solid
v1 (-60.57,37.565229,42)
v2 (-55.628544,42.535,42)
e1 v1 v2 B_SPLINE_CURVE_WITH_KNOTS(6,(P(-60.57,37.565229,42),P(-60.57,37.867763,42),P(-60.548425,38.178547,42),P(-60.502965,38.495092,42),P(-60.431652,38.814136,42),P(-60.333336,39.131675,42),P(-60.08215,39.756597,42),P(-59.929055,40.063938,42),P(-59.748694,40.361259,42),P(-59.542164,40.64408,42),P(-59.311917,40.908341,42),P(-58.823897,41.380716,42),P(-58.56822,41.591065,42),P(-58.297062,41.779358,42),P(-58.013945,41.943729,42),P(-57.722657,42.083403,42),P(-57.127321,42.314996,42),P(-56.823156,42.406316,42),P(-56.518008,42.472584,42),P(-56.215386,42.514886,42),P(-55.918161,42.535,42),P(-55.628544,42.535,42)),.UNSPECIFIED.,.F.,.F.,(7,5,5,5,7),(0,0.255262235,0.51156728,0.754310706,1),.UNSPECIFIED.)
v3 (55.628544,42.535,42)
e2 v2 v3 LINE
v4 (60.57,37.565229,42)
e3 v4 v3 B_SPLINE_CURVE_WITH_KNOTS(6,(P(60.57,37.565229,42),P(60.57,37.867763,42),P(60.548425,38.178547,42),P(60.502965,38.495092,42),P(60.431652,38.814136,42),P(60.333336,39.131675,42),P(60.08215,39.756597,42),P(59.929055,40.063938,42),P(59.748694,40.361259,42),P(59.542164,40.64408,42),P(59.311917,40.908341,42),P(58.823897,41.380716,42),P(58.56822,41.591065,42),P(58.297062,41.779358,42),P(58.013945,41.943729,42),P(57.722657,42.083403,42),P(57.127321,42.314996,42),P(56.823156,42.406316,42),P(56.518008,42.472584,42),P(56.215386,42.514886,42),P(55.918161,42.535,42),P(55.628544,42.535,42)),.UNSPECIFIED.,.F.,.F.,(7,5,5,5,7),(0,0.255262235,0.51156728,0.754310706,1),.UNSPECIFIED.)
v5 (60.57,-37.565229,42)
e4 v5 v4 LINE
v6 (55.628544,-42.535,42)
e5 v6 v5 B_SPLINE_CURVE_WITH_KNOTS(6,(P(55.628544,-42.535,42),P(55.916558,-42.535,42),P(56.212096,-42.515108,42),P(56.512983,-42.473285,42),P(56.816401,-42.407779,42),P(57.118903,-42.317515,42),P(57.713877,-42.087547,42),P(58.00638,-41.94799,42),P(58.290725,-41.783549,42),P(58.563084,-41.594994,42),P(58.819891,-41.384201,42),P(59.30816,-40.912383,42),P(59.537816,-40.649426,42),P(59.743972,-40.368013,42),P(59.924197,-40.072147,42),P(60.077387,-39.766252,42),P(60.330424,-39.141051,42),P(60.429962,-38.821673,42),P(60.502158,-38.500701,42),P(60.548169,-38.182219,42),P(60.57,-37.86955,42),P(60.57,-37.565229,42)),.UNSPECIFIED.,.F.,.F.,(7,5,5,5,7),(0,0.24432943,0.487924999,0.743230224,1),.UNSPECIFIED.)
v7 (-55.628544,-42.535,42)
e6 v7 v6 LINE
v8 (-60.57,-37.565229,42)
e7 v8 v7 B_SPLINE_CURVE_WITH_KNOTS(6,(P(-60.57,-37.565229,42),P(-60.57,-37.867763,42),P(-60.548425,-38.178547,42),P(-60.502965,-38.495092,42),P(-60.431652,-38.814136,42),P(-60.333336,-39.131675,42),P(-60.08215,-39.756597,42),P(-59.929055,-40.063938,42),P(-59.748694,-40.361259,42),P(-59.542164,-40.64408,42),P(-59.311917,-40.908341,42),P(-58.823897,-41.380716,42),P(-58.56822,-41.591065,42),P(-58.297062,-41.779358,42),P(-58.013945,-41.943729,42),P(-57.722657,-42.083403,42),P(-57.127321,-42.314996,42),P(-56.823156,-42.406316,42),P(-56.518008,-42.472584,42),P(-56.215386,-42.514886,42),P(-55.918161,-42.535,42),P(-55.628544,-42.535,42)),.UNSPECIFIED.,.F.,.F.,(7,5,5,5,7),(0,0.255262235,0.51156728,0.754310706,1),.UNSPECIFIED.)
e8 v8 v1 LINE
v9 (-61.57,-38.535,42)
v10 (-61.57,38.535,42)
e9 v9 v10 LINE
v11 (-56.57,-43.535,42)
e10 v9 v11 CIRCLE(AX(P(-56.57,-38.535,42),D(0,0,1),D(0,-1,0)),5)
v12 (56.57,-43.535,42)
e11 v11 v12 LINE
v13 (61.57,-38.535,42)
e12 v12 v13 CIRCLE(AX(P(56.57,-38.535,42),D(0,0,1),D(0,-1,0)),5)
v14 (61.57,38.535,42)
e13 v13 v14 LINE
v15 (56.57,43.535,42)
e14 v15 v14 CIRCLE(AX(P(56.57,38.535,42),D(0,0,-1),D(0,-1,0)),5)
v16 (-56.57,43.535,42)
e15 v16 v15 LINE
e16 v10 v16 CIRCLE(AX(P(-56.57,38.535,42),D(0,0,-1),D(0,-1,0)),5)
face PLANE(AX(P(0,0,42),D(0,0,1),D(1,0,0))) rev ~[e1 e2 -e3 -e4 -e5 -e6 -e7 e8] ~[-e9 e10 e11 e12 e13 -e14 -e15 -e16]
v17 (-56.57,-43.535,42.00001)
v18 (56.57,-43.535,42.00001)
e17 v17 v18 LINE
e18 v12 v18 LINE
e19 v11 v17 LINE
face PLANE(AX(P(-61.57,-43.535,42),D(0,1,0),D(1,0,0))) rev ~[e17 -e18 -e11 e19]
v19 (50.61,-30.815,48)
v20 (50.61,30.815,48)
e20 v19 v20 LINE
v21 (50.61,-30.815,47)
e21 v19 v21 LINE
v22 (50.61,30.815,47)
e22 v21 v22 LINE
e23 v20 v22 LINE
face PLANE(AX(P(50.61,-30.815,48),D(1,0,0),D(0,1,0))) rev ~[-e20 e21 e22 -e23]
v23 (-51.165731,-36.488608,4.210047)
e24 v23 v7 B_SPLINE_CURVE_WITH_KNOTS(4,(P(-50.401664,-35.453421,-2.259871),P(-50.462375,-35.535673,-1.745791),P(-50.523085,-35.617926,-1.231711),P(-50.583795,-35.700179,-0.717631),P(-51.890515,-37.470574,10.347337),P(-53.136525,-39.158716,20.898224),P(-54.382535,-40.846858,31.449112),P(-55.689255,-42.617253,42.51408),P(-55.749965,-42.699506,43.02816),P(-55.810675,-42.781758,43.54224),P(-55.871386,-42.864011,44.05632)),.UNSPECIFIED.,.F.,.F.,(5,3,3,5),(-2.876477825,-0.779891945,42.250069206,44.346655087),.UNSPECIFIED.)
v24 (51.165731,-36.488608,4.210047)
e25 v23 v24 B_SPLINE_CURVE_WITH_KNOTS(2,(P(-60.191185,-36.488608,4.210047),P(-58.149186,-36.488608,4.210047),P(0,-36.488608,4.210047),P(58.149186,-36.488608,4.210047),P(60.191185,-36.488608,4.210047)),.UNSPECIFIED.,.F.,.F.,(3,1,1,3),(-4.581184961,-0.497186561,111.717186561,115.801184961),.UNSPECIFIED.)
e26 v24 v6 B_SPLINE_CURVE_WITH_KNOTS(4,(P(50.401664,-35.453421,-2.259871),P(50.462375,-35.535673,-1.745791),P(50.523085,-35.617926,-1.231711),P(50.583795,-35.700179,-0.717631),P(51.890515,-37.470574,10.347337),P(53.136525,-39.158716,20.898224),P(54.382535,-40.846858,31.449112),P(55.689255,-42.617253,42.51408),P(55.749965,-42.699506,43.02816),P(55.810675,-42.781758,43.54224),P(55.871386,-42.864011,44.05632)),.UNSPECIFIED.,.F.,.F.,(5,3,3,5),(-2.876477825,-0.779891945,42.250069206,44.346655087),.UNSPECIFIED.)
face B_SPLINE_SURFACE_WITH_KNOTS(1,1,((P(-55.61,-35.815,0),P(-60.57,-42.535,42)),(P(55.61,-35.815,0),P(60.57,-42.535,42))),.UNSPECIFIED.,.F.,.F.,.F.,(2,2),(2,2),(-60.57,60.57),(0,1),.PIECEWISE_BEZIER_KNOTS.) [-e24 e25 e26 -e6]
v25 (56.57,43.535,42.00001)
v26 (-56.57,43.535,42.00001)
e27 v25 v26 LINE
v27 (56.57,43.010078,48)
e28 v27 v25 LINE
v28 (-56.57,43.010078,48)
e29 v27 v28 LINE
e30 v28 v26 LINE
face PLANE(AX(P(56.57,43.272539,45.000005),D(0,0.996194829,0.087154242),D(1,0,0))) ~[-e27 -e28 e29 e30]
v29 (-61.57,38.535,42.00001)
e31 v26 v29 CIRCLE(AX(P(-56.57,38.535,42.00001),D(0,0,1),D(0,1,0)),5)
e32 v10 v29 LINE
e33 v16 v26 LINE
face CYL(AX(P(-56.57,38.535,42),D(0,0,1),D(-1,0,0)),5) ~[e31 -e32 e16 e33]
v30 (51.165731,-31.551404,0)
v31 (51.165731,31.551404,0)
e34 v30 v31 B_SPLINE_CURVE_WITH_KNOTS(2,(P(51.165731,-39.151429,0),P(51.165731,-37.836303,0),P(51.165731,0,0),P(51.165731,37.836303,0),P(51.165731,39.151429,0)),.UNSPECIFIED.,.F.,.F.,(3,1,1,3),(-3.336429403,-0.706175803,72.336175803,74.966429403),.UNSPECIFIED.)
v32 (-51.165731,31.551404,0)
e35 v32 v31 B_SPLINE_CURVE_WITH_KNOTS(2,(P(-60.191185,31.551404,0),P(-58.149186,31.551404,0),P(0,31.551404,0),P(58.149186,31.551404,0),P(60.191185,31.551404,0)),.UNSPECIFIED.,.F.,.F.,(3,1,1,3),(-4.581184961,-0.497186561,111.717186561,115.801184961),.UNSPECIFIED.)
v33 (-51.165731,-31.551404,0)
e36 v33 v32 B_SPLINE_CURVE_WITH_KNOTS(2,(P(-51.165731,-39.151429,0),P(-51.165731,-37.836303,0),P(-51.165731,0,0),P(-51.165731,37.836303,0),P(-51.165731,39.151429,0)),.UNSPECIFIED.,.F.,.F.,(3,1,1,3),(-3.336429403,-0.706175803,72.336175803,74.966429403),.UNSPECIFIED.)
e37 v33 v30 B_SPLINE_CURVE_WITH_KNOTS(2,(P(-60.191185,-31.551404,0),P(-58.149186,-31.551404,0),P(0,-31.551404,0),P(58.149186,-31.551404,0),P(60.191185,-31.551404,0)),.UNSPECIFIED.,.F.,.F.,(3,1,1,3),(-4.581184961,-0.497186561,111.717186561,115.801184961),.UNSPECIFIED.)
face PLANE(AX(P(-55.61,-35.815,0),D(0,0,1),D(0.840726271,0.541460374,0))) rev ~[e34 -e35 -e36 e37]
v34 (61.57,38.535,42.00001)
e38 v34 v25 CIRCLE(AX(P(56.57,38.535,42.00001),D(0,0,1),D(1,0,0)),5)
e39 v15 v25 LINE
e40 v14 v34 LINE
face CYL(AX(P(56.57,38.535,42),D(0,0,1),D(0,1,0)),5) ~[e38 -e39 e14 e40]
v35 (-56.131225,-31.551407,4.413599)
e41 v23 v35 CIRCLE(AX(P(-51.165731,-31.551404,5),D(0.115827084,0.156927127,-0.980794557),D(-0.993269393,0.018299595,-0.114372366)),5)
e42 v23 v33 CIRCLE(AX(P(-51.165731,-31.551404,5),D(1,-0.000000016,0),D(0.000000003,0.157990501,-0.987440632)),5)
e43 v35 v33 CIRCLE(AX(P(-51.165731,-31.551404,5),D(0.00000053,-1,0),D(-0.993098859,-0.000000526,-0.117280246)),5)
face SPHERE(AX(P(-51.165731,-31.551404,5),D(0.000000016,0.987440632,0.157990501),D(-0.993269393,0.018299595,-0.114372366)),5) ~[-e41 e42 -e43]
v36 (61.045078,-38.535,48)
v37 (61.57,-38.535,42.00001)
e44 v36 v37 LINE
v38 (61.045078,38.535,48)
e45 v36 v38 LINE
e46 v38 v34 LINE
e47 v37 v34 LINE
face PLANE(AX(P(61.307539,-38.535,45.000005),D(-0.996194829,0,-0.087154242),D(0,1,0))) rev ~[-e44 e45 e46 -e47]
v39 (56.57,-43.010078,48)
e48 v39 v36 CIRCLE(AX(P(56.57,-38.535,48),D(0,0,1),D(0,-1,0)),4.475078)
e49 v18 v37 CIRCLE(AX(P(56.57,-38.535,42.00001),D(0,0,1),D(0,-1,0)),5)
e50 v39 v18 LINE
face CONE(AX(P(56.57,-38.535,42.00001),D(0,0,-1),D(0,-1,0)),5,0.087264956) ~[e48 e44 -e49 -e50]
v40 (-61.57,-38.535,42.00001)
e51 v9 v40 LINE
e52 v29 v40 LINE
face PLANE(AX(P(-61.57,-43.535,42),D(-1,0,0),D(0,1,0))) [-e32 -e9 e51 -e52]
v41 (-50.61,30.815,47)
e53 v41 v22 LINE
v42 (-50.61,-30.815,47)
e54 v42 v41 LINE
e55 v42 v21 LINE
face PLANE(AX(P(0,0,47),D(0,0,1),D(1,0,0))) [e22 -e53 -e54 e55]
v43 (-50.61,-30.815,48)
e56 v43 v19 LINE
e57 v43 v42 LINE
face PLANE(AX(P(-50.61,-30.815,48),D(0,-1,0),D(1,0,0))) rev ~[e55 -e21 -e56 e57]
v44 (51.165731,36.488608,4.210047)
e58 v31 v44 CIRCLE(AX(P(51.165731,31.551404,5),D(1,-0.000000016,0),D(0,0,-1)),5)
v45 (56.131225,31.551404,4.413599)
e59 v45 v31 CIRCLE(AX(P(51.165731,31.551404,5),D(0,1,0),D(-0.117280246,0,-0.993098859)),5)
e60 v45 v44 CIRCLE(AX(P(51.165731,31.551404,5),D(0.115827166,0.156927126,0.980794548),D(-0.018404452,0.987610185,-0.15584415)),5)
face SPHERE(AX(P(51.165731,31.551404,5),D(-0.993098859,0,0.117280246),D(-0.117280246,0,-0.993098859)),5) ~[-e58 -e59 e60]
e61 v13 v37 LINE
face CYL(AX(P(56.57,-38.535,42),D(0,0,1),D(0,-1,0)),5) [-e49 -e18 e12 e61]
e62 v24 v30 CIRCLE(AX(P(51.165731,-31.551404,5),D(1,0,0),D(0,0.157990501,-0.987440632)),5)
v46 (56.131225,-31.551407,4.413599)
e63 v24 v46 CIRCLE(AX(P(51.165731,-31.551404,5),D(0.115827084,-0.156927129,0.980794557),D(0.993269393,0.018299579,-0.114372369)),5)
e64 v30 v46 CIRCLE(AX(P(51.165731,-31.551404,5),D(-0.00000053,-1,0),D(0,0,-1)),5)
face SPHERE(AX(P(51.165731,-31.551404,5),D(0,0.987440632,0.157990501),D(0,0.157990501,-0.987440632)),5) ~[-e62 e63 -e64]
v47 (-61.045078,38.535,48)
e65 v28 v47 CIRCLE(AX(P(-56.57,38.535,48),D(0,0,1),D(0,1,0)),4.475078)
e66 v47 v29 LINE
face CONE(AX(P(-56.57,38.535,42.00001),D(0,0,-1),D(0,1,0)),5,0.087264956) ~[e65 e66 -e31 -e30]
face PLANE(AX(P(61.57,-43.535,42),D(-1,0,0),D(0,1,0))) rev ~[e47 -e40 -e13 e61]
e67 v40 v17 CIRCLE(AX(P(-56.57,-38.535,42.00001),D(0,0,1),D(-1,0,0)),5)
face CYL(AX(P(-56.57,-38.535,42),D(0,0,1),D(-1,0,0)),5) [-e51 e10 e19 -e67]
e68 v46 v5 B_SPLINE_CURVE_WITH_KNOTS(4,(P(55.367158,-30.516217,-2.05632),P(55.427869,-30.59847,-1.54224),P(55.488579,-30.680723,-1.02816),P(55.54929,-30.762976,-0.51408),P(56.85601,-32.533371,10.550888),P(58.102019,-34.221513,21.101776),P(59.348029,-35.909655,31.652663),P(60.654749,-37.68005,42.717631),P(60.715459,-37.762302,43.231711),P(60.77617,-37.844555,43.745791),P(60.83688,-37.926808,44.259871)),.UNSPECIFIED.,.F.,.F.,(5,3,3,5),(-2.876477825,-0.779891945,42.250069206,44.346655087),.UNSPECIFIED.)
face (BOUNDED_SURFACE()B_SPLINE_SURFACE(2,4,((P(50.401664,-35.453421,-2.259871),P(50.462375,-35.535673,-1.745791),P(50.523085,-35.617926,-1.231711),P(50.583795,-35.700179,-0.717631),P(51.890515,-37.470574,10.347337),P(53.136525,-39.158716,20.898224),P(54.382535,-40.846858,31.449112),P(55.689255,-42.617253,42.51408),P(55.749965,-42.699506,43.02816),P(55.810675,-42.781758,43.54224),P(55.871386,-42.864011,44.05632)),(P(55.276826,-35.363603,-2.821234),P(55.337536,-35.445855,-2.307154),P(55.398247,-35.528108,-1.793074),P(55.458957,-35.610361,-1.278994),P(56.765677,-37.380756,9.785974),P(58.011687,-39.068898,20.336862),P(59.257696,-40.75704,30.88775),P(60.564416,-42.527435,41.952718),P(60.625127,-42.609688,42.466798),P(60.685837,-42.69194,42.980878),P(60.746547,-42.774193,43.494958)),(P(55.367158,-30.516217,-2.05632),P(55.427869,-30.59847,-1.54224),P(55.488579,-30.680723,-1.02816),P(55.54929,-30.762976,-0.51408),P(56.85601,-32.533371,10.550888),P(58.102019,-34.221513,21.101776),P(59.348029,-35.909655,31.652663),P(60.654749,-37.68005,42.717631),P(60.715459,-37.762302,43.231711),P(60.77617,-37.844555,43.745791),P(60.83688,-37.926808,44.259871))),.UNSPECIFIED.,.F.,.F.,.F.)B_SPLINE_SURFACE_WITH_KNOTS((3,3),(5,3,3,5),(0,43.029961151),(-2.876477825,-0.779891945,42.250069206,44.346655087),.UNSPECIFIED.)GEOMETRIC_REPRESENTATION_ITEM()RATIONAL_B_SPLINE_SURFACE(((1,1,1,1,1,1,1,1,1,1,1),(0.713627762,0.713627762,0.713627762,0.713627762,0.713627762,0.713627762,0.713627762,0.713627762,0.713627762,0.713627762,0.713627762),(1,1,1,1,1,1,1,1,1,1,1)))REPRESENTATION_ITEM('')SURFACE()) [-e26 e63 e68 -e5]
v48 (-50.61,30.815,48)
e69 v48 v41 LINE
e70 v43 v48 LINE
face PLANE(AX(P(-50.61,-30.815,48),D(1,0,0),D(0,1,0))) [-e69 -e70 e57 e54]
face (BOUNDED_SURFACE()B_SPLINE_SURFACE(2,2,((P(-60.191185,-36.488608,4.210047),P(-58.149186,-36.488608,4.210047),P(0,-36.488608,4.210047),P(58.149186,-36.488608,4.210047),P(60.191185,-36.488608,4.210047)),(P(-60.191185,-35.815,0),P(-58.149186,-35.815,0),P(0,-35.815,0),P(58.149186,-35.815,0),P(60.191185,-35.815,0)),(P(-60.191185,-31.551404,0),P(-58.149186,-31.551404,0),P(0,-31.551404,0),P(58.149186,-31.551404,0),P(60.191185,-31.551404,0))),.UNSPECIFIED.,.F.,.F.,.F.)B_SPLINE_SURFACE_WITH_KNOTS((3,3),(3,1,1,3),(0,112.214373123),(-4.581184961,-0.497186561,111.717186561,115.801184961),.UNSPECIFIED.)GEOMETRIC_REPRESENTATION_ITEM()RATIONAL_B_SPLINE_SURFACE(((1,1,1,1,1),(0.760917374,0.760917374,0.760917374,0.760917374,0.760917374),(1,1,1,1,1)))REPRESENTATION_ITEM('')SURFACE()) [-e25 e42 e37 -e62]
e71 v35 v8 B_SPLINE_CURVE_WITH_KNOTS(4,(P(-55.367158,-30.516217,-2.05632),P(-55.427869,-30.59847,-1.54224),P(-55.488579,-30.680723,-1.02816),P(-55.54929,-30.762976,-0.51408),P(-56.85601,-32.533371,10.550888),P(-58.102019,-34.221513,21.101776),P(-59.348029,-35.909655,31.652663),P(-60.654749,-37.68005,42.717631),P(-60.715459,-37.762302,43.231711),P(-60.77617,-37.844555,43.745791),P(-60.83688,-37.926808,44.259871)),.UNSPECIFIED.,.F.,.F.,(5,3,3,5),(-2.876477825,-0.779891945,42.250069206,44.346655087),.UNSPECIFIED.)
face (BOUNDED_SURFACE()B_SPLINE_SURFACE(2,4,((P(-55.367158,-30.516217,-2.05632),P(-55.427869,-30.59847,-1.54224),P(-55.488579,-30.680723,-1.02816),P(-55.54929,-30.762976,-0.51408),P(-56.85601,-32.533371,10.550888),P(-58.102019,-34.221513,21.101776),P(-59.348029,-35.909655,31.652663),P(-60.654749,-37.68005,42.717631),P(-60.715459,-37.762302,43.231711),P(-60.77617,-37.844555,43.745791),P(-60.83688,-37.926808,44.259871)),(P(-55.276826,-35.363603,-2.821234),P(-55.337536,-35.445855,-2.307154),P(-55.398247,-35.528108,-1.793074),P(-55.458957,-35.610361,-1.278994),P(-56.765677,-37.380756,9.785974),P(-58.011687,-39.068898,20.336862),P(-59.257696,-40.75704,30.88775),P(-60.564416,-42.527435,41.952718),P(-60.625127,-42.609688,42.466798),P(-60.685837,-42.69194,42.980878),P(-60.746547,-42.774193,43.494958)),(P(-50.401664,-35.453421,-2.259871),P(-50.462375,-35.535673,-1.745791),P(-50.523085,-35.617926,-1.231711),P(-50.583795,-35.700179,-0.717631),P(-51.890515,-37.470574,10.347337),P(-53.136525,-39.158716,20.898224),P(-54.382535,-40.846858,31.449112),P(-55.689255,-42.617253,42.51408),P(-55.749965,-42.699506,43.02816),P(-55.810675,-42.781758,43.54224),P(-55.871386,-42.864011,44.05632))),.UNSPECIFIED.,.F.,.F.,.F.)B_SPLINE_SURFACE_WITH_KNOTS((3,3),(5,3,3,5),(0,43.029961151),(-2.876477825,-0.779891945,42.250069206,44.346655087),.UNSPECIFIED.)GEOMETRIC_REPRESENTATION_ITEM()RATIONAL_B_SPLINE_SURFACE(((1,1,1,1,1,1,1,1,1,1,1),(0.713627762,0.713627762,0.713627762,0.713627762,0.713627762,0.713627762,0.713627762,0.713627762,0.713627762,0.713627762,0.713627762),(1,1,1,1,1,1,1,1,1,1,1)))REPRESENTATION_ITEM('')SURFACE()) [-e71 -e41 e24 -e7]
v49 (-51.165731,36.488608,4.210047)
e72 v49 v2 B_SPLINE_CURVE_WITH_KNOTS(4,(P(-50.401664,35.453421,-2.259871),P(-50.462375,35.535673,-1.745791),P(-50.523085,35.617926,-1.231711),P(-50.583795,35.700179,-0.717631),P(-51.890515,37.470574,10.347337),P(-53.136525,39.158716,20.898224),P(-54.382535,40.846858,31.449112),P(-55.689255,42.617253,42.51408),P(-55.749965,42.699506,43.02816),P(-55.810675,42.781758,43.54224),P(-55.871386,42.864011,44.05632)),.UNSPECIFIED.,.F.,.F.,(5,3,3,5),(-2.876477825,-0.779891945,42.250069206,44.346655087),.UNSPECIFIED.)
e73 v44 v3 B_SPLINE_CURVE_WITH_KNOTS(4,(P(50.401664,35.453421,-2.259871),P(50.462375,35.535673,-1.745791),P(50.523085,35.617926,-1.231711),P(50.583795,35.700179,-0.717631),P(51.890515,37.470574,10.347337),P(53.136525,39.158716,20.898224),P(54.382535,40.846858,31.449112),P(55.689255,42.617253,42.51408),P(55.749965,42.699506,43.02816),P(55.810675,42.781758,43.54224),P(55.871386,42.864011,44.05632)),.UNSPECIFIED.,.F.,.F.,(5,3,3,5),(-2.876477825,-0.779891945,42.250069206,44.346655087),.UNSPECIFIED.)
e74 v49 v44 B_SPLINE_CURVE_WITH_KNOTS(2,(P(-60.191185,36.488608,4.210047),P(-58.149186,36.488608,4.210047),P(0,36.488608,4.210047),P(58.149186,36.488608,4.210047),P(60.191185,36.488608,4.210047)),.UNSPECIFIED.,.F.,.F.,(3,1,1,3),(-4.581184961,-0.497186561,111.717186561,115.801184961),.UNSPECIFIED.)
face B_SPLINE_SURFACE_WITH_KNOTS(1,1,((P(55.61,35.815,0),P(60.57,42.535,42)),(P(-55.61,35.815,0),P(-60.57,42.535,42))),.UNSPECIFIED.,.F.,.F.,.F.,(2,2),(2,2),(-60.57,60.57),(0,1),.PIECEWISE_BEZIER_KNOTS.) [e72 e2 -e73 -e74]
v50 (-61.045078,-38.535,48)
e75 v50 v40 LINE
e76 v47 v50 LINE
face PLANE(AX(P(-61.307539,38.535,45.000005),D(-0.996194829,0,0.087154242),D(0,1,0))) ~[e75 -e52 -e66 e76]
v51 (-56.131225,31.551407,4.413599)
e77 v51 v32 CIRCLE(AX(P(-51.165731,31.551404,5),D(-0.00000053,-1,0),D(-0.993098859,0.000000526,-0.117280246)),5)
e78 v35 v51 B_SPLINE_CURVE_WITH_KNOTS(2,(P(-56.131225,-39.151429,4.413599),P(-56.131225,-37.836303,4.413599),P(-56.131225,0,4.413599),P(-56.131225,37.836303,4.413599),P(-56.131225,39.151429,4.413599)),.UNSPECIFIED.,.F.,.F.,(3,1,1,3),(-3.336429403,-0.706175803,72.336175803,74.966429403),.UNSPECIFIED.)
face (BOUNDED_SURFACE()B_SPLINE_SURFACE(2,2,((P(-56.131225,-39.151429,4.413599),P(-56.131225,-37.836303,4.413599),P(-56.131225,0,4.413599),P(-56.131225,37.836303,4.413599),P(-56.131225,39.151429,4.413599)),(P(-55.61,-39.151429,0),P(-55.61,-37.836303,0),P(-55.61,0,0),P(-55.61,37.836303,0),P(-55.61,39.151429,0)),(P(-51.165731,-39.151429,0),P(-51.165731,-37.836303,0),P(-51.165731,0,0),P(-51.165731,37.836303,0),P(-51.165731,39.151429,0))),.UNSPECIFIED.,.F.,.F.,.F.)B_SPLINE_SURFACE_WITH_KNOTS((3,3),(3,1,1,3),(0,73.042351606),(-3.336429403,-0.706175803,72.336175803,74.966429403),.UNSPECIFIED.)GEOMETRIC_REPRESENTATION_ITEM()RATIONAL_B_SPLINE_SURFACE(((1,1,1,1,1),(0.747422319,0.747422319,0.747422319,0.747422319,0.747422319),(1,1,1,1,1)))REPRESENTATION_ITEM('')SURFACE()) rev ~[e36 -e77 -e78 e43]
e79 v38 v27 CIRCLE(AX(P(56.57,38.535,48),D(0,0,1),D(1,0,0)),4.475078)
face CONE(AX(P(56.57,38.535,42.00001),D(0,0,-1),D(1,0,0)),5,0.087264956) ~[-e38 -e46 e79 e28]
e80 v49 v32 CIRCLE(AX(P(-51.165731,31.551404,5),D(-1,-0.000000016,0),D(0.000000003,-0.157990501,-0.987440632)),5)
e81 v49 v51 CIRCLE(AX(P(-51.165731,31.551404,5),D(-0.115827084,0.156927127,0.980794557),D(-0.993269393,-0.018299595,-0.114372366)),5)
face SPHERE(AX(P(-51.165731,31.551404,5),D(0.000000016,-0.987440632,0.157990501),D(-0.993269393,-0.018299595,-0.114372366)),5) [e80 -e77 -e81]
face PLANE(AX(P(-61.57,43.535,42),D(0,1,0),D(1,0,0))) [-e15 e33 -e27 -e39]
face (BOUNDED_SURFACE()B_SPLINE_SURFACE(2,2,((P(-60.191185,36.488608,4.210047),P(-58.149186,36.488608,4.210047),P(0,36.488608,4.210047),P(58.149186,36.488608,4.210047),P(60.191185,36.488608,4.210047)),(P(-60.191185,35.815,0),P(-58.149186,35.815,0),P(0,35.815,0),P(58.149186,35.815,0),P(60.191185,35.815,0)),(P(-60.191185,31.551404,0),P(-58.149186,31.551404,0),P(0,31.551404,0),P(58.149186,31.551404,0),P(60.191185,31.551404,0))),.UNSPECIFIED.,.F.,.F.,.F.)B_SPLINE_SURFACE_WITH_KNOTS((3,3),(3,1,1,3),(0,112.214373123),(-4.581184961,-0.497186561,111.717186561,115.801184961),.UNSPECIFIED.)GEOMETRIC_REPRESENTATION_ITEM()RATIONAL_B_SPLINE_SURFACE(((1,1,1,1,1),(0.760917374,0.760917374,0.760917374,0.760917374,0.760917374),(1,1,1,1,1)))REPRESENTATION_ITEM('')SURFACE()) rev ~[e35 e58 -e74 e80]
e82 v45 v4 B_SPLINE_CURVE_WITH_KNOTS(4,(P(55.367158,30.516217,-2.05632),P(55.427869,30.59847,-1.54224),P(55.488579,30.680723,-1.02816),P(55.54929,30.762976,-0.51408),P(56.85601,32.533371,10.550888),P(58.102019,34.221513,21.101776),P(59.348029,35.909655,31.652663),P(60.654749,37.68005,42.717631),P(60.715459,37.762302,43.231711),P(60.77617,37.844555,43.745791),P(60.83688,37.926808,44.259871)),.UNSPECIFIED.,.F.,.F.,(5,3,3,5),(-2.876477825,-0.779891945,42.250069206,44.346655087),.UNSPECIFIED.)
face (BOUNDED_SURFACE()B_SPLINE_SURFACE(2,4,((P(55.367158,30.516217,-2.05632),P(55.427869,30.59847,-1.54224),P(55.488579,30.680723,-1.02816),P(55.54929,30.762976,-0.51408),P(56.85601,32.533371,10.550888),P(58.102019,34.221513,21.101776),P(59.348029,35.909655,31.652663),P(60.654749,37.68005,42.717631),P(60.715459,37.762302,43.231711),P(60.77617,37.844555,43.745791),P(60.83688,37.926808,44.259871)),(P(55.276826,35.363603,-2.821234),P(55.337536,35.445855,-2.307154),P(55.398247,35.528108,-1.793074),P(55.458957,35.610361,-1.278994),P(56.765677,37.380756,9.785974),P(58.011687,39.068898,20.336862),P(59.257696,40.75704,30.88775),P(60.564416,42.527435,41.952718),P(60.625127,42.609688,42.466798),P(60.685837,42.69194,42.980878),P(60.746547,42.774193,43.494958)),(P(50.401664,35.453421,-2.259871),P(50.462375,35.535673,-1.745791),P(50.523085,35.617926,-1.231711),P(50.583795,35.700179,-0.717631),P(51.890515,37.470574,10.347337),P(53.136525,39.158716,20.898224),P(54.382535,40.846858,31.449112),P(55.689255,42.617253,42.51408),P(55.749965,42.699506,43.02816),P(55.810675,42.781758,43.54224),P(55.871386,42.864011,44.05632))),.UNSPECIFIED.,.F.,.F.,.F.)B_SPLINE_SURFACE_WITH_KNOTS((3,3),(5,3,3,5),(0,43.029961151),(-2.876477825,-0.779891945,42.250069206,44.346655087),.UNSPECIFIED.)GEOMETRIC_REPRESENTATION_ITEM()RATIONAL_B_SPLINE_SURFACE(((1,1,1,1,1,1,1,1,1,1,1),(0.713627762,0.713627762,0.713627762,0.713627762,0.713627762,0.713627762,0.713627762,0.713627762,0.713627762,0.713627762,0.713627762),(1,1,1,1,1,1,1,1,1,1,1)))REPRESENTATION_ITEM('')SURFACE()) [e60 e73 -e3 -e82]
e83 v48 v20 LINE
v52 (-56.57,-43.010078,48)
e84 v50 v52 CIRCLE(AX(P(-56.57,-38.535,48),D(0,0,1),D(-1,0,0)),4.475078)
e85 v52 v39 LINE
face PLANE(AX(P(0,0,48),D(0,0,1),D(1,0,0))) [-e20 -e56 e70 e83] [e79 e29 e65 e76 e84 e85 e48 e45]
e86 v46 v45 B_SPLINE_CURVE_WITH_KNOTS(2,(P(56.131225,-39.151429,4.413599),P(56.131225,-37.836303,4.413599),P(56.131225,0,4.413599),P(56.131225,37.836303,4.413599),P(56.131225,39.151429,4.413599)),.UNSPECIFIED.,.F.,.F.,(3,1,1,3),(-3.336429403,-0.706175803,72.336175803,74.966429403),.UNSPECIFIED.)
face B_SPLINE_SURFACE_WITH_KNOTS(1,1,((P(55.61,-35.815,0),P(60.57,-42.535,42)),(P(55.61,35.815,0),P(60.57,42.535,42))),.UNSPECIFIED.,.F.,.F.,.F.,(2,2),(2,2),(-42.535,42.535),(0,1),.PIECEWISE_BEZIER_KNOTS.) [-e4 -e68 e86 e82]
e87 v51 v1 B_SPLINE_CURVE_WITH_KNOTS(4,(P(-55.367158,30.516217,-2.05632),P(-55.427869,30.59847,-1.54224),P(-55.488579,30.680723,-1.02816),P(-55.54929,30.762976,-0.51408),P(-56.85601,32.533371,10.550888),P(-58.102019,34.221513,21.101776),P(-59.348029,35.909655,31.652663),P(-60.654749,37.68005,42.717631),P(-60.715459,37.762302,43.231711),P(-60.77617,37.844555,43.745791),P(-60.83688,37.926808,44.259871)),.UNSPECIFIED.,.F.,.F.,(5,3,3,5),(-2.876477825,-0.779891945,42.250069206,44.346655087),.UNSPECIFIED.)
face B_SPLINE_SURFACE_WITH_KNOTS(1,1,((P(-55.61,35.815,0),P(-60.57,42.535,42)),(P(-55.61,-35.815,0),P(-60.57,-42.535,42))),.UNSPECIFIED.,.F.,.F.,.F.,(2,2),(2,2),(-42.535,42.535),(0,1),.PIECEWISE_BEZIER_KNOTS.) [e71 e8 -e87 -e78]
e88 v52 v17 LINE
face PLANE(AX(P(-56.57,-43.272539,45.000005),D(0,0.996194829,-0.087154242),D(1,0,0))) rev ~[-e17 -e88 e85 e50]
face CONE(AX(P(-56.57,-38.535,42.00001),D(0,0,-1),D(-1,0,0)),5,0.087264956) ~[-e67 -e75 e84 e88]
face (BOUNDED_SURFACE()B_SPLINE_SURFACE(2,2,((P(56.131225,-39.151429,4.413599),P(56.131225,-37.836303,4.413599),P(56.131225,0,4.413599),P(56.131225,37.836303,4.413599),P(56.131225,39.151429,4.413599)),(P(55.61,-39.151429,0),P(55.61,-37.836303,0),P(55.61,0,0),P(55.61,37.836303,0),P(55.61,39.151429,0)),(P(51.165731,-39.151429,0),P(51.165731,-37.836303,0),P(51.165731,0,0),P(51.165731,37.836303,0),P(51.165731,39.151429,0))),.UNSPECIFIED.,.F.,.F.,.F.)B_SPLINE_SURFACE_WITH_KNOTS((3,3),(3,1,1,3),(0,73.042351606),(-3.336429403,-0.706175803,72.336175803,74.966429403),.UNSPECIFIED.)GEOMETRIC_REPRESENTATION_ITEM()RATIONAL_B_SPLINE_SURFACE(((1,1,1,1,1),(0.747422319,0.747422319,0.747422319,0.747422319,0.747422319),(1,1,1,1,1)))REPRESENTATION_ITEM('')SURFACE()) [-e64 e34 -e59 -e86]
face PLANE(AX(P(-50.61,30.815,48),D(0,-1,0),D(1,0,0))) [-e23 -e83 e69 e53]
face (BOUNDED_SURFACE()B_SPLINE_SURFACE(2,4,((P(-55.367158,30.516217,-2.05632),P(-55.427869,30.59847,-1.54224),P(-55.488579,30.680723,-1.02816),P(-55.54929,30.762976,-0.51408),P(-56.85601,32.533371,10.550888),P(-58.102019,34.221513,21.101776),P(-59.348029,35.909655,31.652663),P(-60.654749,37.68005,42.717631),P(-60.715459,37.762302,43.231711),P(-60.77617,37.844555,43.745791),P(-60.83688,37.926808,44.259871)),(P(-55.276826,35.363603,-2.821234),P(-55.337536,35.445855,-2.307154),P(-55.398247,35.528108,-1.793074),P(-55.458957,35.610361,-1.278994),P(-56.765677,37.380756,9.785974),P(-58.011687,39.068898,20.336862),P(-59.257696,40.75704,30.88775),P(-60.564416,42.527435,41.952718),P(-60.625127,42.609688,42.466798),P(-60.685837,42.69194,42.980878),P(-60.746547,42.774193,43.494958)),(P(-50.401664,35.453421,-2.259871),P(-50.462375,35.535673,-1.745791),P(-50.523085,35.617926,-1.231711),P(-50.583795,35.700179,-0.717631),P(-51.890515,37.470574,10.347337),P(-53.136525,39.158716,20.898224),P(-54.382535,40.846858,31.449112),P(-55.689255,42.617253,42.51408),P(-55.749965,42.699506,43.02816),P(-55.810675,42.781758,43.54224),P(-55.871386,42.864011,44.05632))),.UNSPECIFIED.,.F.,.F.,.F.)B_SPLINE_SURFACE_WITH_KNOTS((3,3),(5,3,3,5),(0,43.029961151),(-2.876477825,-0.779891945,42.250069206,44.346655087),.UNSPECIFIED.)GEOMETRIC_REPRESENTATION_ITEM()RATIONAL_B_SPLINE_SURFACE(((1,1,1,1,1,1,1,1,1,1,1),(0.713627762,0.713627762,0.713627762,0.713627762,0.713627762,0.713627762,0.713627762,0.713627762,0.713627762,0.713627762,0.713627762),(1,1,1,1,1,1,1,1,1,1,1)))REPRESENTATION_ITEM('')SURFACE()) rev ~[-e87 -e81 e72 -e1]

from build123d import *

# Parameters (mm, degrees)
F0_W      = 111.22
F0_H      = 71.63
F2_W      = 121.14
F2_H      = 85.07
F4_R      = 5
F5_W      = 123.14
F5_H      = 87.07
F6_DEPTH  = 6
F7_W      = 101.22
F7_H      = 61.63
F8_DEPTH  = 1
F9_R      = 5
F10_SIZE2 = 5.99999
F10_SIZE  = 0.524922


# Not quite as in the source:
# - a fillet or chamfer is up to 0.001 mm smaller than in the source, because OpenCascade refuses the exact size


with BuildPart() as f3:
    # F0 (on Top) → F3 section 0
    with BuildSketch(Plane.XY):
        Rectangle(F0_W, F0_H)
    # F2 (on offset) → F3 section 1
    with BuildSketch(Plane.XY.offset(42)):
        Rectangle(F2_W, F2_H)
    loft()

    # F4
    f4_edges = [f3.edges().sort_by_distance(p)[0] for p in [
        (-55.61, 0, 0),
        (-58.09, 39.175, 21),
        (0, 35.815, 0),
        (55.61, 0, 0),
        (58.09, 39.175, 21),
        (-58.09, -39.175, 21),
        (0, -35.815, 0),
        (58.09, -39.175, 21),
    ]]
    fillet(f4_edges, radius=F4_R)

    # F5 (on face) → F6 (join)
    with BuildSketch(Plane.XY.offset(42)):
        Rectangle(F5_W, F5_H)
        with BuildLine():
            Line((60.57, 37.5652286365), (60.57, -37.5652286365))
            add(Edge.make_bspline(
                [(60.57, -37.5652286365), (60.57, -37.8677629795), (60.5484249291, -38.1785474247), (60.5029654317, -38.4950915318), (60.4316524162, -38.8141360023), (60.3333363666, -39.1316751054), (60.0821499269, -39.7565973164), (59.9290553292, -40.0639382754), (59.7486936762, -40.3612591505), (59.5421641644, -40.6440796366), (59.3119172372, -40.9083408285), (58.8238966802, -41.3807158702), (58.5682195509, -41.5910650721), (58.2970619174, -41.7793580892), (58.013945443, -41.9437291503), (57.7226574277, -42.0834034649), (57.1273207787, -42.3149957608), (56.8231561933, -42.4063160322), (56.5180078096, -42.4725842951), (56.2153860403, -42.5148862736), (55.9181609136, -42.535), (55.628544141, -42.535)],
                knots=[0, 0, 0, 0, 0, 0, 0, 0.2552622354, 0.2552622354, 0.2552622354, 0.2552622354, 0.2552622354, 0.5115672797, 0.5115672797, 0.5115672797, 0.5115672797, 0.5115672797, 0.7543107062, 0.7543107062, 0.7543107062, 0.7543107062, 0.7543107062, 1, 1, 1, 1, 1, 1, 1], degree=6))
            Line((55.628544141, -42.535), (-55.628544141, -42.535))
            add(Edge.make_bspline(
                [(-60.57, -37.5652286365), (-60.57, -37.8677629794), (-60.5484249292, -38.1785474246), (-60.5029654317, -38.4950915316), (-60.4316524163, -38.814136002), (-60.3333363667, -39.1316751051), (-60.0821499271, -39.756597316), (-59.9290553294, -40.0639382751), (-59.7486936764, -40.3612591501), (-59.5421641646, -40.6440796363), (-59.3119172375, -40.9083408282), (-58.8238966804, -41.38071587), (-58.5682195512, -41.591065072), (-58.2970619176, -41.7793580891), (-58.0139454431, -41.9437291502), (-57.7226574278, -42.0834034648), (-57.1273207787, -42.3149957608), (-56.8231561933, -42.4063160322), (-56.5180078096, -42.4725842951), (-56.2153860403, -42.5148862736), (-55.9181609136, -42.535), (-55.628544141, -42.535)],
                knots=[0, 0, 0, 0, 0, 0, 0, 0.2552622353, 0.2552622353, 0.2552622353, 0.2552622353, 0.2552622353, 0.5115672797, 0.5115672797, 0.5115672797, 0.5115672797, 0.5115672797, 0.7543107062, 0.7543107062, 0.7543107062, 0.7543107062, 0.7543107062, 1, 1, 1, 1, 1, 1, 1], degree=6))
            Line((-60.57, -37.5652286365), (-60.57, 37.5652286365))
            add(Edge.make_bspline(
                [(-55.628544141, 42.535), (-55.9165579294, 42.535), (-56.2120960387, 42.5151083241), (-56.5129833201, 42.4732846379), (-56.8164007689, 42.4077788273), (-57.1189028719, 42.3175153178), (-57.7138767296, 42.0875473103), (-58.0063798227, 41.9479897602), (-58.2907253957, 41.7835490477), (-58.5630840084, 41.5949938834), (-58.8198912965, 41.3842007295), (-59.3081604347, 40.9123831651), (-59.5378156039, 40.6494264179), (-59.7439719788, 40.3680131083), (-59.924197311, 40.0721470067), (-60.0773872558, 39.7662523131), (-60.3304237584, 39.1410513034), (-60.4299622755, 38.821673494), (-60.5021575431, 38.500700594), (-60.5481693204, 38.1822186305), (-60.57, 37.8695496868), (-60.57, 37.5652286365)],
                knots=[0, 0, 0, 0, 0, 0, 0, 0.2443294294, 0.2443294294, 0.2443294294, 0.2443294294, 0.2443294294, 0.4879249993, 0.4879249993, 0.4879249993, 0.4879249993, 0.4879249993, 0.7432302237, 0.7432302237, 0.7432302237, 0.7432302237, 0.7432302237, 1, 1, 1, 1, 1, 1, 1], degree=6))
            Line((-55.628544141, 42.535), (55.628544141, 42.535))
            add(Edge.make_bspline(
                [(60.57, 37.5652286365), (60.57, 37.8677629794), (60.5484249292, 38.1785474246), (60.5029654317, 38.4950915316), (60.4316524163, 38.814136002), (60.3333363667, 39.1316751051), (60.0821499271, 39.756597316), (59.9290553294, 40.0639382751), (59.7486936764, 40.3612591501), (59.5421641646, 40.6440796363), (59.3119172375, 40.9083408282), (58.8238966804, 41.38071587), (58.5682195512, 41.591065072), (58.2970619176, 41.7793580891), (58.0139454431, 41.9437291502), (57.7226574278, 42.0834034648), (57.1273207787, 42.3149957608), (56.8231561933, 42.4063160322), (56.5180078096, 42.4725842951), (56.2153860403, 42.5148862736), (55.9181609136, 42.535), (55.628544141, 42.535)],
                knots=[0, 0, 0, 0, 0, 0, 0, 0.2552622353, 0.2552622353, 0.2552622353, 0.2552622353, 0.2552622353, 0.5115672797, 0.5115672797, 0.5115672797, 0.5115672797, 0.5115672797, 0.7543107062, 0.7543107062, 0.7543107062, 0.7543107062, 0.7543107062, 1, 1, 1, 1, 1, 1, 1], degree=6))
        make_face(mode=Mode.SUBTRACT)
        with BuildLine():
            add(Edge.make_bspline(
                [(60.57, -37.5652286365), (60.57, -37.8677629795), (60.5484249291, -38.1785474247), (60.5029654317, -38.4950915318), (60.4316524162, -38.8141360023), (60.3333363666, -39.1316751054), (60.0821499269, -39.7565973164), (59.9290553292, -40.0639382754), (59.7486936762, -40.3612591505), (59.5421641644, -40.6440796366), (59.3119172372, -40.9083408285), (58.8238966802, -41.3807158702), (58.5682195509, -41.5910650721), (58.2970619174, -41.7793580892), (58.013945443, -41.9437291503), (57.7226574277, -42.0834034649), (57.1273207787, -42.3149957608), (56.8231561933, -42.4063160322), (56.5180078096, -42.4725842951), (56.2153860403, -42.5148862736), (55.9181609136, -42.535), (55.628544141, -42.535)],
                knots=[0, 0, 0, 0, 0, 0, 0, 0.2552622354, 0.2552622354, 0.2552622354, 0.2552622354, 0.2552622354, 0.5115672797, 0.5115672797, 0.5115672797, 0.5115672797, 0.5115672797, 0.7543107062, 0.7543107062, 0.7543107062, 0.7543107062, 0.7543107062, 1, 1, 1, 1, 1, 1, 1], degree=6))
            Line((60.57, -37.5652286365), (60.57, 37.5652286365))
            add(Edge.make_bspline(
                [(60.57, 37.5652286365), (60.57, 37.8677629794), (60.5484249292, 38.1785474246), (60.5029654317, 38.4950915316), (60.4316524163, 38.814136002), (60.3333363667, 39.1316751051), (60.0821499271, 39.756597316), (59.9290553294, 40.0639382751), (59.7486936764, 40.3612591501), (59.5421641646, 40.6440796363), (59.3119172375, 40.9083408282), (58.8238966804, 41.38071587), (58.5682195512, 41.591065072), (58.2970619176, 41.7793580891), (58.0139454431, 41.9437291502), (57.7226574278, 42.0834034648), (57.1273207787, 42.3149957608), (56.8231561933, 42.4063160322), (56.5180078096, 42.4725842951), (56.2153860403, 42.5148862736), (55.9181609136, 42.535), (55.628544141, 42.535)],
                knots=[0, 0, 0, 0, 0, 0, 0, 0.2552622353, 0.2552622353, 0.2552622353, 0.2552622353, 0.2552622353, 0.5115672797, 0.5115672797, 0.5115672797, 0.5115672797, 0.5115672797, 0.7543107062, 0.7543107062, 0.7543107062, 0.7543107062, 0.7543107062, 1, 1, 1, 1, 1, 1, 1], degree=6))
            Line((55.628544141, 42.535), (-55.628544141, 42.535))
            add(Edge.make_bspline(
                [(-55.628544141, 42.535), (-55.9165579294, 42.535), (-56.2120960387, 42.5151083241), (-56.5129833201, 42.4732846379), (-56.8164007689, 42.4077788273), (-57.1189028719, 42.3175153178), (-57.7138767296, 42.0875473103), (-58.0063798227, 41.9479897602), (-58.2907253957, 41.7835490477), (-58.5630840084, 41.5949938834), (-58.8198912965, 41.3842007295), (-59.3081604347, 40.9123831651), (-59.5378156039, 40.6494264179), (-59.7439719788, 40.3680131083), (-59.924197311, 40.0721470067), (-60.0773872558, 39.7662523131), (-60.3304237584, 39.1410513034), (-60.4299622755, 38.821673494), (-60.5021575431, 38.500700594), (-60.5481693204, 38.1822186305), (-60.57, 37.8695496868), (-60.57, 37.5652286365)],
                knots=[0, 0, 0, 0, 0, 0, 0, 0.2443294294, 0.2443294294, 0.2443294294, 0.2443294294, 0.2443294294, 0.4879249993, 0.4879249993, 0.4879249993, 0.4879249993, 0.4879249993, 0.7432302237, 0.7432302237, 0.7432302237, 0.7432302237, 0.7432302237, 1, 1, 1, 1, 1, 1, 1], degree=6))
            Line((-60.57, 37.5652286365), (-60.57, -37.5652286365))
            add(Edge.make_bspline(
                [(-60.57, -37.5652286365), (-60.57, -37.8677629794), (-60.5484249292, -38.1785474246), (-60.5029654317, -38.4950915316), (-60.4316524163, -38.814136002), (-60.3333363667, -39.1316751051), (-60.0821499271, -39.756597316), (-59.9290553294, -40.0639382751), (-59.7486936764, -40.3612591501), (-59.5421641646, -40.6440796363), (-59.3119172375, -40.9083408282), (-58.8238966804, -41.38071587), (-58.5682195512, -41.591065072), (-58.2970619176, -41.7793580891), (-58.0139454431, -41.9437291502), (-57.7226574278, -42.0834034648), (-57.1273207787, -42.3149957608), (-56.8231561933, -42.4063160322), (-56.5180078096, -42.4725842951), (-56.2153860403, -42.5148862736), (-55.9181609136, -42.535), (-55.628544141, -42.535)],
                knots=[0, 0, 0, 0, 0, 0, 0, 0.2552622353, 0.2552622353, 0.2552622353, 0.2552622353, 0.2552622353, 0.5115672797, 0.5115672797, 0.5115672797, 0.5115672797, 0.5115672797, 0.7543107062, 0.7543107062, 0.7543107062, 0.7543107062, 0.7543107062, 1, 1, 1, 1, 1, 1, 1], degree=6))
            Line((-55.628544141, -42.535), (55.628544141, -42.535))
        make_face()
    extrude(amount=F6_DEPTH)

    # F7 (on face) → F8 (cut)
    with BuildSketch(Plane.XY.offset(48)):
        Rectangle(F7_W, F7_H)
    extrude(amount=-F8_DEPTH, mode=Mode.SUBTRACT)

    # F9
    f9_edges = [f3.edges().sort_by_distance(p)[0] for p in [
        (-61.57, 43.535, 45),
        (-61.57, -43.535, 45),
        (61.57, -43.535, 45),
        (61.57, 43.535, 45),
    ]]
    fillet(f9_edges, radius=F9_R)

    # F10 (size 0.5249319812 and 6 in the source; OpenCascade refuses exactly that, so slightly less here)
    f10_edges = [f3.edges().sort_by_distance(p)[0] for p in [
        (61.57, 0, 48),
        (60.105534, 42.070534, 48),
        (0, 43.535, 48),
        (-60.105534, 42.070534, 48),
        (-61.57, 0, 48),
        (-60.105534, -42.070534, 48),
        (0, -43.535, 48),
        (60.105534, -42.070534, 48),
    ]]
    f10_side = f3.faces().sort_by_distance((60.061867, 0, 48))[0]
    chamfer(f10_edges, length=F10_SIZE, length2=F10_SIZE2, reference=f10_side)


solid = f3.part
